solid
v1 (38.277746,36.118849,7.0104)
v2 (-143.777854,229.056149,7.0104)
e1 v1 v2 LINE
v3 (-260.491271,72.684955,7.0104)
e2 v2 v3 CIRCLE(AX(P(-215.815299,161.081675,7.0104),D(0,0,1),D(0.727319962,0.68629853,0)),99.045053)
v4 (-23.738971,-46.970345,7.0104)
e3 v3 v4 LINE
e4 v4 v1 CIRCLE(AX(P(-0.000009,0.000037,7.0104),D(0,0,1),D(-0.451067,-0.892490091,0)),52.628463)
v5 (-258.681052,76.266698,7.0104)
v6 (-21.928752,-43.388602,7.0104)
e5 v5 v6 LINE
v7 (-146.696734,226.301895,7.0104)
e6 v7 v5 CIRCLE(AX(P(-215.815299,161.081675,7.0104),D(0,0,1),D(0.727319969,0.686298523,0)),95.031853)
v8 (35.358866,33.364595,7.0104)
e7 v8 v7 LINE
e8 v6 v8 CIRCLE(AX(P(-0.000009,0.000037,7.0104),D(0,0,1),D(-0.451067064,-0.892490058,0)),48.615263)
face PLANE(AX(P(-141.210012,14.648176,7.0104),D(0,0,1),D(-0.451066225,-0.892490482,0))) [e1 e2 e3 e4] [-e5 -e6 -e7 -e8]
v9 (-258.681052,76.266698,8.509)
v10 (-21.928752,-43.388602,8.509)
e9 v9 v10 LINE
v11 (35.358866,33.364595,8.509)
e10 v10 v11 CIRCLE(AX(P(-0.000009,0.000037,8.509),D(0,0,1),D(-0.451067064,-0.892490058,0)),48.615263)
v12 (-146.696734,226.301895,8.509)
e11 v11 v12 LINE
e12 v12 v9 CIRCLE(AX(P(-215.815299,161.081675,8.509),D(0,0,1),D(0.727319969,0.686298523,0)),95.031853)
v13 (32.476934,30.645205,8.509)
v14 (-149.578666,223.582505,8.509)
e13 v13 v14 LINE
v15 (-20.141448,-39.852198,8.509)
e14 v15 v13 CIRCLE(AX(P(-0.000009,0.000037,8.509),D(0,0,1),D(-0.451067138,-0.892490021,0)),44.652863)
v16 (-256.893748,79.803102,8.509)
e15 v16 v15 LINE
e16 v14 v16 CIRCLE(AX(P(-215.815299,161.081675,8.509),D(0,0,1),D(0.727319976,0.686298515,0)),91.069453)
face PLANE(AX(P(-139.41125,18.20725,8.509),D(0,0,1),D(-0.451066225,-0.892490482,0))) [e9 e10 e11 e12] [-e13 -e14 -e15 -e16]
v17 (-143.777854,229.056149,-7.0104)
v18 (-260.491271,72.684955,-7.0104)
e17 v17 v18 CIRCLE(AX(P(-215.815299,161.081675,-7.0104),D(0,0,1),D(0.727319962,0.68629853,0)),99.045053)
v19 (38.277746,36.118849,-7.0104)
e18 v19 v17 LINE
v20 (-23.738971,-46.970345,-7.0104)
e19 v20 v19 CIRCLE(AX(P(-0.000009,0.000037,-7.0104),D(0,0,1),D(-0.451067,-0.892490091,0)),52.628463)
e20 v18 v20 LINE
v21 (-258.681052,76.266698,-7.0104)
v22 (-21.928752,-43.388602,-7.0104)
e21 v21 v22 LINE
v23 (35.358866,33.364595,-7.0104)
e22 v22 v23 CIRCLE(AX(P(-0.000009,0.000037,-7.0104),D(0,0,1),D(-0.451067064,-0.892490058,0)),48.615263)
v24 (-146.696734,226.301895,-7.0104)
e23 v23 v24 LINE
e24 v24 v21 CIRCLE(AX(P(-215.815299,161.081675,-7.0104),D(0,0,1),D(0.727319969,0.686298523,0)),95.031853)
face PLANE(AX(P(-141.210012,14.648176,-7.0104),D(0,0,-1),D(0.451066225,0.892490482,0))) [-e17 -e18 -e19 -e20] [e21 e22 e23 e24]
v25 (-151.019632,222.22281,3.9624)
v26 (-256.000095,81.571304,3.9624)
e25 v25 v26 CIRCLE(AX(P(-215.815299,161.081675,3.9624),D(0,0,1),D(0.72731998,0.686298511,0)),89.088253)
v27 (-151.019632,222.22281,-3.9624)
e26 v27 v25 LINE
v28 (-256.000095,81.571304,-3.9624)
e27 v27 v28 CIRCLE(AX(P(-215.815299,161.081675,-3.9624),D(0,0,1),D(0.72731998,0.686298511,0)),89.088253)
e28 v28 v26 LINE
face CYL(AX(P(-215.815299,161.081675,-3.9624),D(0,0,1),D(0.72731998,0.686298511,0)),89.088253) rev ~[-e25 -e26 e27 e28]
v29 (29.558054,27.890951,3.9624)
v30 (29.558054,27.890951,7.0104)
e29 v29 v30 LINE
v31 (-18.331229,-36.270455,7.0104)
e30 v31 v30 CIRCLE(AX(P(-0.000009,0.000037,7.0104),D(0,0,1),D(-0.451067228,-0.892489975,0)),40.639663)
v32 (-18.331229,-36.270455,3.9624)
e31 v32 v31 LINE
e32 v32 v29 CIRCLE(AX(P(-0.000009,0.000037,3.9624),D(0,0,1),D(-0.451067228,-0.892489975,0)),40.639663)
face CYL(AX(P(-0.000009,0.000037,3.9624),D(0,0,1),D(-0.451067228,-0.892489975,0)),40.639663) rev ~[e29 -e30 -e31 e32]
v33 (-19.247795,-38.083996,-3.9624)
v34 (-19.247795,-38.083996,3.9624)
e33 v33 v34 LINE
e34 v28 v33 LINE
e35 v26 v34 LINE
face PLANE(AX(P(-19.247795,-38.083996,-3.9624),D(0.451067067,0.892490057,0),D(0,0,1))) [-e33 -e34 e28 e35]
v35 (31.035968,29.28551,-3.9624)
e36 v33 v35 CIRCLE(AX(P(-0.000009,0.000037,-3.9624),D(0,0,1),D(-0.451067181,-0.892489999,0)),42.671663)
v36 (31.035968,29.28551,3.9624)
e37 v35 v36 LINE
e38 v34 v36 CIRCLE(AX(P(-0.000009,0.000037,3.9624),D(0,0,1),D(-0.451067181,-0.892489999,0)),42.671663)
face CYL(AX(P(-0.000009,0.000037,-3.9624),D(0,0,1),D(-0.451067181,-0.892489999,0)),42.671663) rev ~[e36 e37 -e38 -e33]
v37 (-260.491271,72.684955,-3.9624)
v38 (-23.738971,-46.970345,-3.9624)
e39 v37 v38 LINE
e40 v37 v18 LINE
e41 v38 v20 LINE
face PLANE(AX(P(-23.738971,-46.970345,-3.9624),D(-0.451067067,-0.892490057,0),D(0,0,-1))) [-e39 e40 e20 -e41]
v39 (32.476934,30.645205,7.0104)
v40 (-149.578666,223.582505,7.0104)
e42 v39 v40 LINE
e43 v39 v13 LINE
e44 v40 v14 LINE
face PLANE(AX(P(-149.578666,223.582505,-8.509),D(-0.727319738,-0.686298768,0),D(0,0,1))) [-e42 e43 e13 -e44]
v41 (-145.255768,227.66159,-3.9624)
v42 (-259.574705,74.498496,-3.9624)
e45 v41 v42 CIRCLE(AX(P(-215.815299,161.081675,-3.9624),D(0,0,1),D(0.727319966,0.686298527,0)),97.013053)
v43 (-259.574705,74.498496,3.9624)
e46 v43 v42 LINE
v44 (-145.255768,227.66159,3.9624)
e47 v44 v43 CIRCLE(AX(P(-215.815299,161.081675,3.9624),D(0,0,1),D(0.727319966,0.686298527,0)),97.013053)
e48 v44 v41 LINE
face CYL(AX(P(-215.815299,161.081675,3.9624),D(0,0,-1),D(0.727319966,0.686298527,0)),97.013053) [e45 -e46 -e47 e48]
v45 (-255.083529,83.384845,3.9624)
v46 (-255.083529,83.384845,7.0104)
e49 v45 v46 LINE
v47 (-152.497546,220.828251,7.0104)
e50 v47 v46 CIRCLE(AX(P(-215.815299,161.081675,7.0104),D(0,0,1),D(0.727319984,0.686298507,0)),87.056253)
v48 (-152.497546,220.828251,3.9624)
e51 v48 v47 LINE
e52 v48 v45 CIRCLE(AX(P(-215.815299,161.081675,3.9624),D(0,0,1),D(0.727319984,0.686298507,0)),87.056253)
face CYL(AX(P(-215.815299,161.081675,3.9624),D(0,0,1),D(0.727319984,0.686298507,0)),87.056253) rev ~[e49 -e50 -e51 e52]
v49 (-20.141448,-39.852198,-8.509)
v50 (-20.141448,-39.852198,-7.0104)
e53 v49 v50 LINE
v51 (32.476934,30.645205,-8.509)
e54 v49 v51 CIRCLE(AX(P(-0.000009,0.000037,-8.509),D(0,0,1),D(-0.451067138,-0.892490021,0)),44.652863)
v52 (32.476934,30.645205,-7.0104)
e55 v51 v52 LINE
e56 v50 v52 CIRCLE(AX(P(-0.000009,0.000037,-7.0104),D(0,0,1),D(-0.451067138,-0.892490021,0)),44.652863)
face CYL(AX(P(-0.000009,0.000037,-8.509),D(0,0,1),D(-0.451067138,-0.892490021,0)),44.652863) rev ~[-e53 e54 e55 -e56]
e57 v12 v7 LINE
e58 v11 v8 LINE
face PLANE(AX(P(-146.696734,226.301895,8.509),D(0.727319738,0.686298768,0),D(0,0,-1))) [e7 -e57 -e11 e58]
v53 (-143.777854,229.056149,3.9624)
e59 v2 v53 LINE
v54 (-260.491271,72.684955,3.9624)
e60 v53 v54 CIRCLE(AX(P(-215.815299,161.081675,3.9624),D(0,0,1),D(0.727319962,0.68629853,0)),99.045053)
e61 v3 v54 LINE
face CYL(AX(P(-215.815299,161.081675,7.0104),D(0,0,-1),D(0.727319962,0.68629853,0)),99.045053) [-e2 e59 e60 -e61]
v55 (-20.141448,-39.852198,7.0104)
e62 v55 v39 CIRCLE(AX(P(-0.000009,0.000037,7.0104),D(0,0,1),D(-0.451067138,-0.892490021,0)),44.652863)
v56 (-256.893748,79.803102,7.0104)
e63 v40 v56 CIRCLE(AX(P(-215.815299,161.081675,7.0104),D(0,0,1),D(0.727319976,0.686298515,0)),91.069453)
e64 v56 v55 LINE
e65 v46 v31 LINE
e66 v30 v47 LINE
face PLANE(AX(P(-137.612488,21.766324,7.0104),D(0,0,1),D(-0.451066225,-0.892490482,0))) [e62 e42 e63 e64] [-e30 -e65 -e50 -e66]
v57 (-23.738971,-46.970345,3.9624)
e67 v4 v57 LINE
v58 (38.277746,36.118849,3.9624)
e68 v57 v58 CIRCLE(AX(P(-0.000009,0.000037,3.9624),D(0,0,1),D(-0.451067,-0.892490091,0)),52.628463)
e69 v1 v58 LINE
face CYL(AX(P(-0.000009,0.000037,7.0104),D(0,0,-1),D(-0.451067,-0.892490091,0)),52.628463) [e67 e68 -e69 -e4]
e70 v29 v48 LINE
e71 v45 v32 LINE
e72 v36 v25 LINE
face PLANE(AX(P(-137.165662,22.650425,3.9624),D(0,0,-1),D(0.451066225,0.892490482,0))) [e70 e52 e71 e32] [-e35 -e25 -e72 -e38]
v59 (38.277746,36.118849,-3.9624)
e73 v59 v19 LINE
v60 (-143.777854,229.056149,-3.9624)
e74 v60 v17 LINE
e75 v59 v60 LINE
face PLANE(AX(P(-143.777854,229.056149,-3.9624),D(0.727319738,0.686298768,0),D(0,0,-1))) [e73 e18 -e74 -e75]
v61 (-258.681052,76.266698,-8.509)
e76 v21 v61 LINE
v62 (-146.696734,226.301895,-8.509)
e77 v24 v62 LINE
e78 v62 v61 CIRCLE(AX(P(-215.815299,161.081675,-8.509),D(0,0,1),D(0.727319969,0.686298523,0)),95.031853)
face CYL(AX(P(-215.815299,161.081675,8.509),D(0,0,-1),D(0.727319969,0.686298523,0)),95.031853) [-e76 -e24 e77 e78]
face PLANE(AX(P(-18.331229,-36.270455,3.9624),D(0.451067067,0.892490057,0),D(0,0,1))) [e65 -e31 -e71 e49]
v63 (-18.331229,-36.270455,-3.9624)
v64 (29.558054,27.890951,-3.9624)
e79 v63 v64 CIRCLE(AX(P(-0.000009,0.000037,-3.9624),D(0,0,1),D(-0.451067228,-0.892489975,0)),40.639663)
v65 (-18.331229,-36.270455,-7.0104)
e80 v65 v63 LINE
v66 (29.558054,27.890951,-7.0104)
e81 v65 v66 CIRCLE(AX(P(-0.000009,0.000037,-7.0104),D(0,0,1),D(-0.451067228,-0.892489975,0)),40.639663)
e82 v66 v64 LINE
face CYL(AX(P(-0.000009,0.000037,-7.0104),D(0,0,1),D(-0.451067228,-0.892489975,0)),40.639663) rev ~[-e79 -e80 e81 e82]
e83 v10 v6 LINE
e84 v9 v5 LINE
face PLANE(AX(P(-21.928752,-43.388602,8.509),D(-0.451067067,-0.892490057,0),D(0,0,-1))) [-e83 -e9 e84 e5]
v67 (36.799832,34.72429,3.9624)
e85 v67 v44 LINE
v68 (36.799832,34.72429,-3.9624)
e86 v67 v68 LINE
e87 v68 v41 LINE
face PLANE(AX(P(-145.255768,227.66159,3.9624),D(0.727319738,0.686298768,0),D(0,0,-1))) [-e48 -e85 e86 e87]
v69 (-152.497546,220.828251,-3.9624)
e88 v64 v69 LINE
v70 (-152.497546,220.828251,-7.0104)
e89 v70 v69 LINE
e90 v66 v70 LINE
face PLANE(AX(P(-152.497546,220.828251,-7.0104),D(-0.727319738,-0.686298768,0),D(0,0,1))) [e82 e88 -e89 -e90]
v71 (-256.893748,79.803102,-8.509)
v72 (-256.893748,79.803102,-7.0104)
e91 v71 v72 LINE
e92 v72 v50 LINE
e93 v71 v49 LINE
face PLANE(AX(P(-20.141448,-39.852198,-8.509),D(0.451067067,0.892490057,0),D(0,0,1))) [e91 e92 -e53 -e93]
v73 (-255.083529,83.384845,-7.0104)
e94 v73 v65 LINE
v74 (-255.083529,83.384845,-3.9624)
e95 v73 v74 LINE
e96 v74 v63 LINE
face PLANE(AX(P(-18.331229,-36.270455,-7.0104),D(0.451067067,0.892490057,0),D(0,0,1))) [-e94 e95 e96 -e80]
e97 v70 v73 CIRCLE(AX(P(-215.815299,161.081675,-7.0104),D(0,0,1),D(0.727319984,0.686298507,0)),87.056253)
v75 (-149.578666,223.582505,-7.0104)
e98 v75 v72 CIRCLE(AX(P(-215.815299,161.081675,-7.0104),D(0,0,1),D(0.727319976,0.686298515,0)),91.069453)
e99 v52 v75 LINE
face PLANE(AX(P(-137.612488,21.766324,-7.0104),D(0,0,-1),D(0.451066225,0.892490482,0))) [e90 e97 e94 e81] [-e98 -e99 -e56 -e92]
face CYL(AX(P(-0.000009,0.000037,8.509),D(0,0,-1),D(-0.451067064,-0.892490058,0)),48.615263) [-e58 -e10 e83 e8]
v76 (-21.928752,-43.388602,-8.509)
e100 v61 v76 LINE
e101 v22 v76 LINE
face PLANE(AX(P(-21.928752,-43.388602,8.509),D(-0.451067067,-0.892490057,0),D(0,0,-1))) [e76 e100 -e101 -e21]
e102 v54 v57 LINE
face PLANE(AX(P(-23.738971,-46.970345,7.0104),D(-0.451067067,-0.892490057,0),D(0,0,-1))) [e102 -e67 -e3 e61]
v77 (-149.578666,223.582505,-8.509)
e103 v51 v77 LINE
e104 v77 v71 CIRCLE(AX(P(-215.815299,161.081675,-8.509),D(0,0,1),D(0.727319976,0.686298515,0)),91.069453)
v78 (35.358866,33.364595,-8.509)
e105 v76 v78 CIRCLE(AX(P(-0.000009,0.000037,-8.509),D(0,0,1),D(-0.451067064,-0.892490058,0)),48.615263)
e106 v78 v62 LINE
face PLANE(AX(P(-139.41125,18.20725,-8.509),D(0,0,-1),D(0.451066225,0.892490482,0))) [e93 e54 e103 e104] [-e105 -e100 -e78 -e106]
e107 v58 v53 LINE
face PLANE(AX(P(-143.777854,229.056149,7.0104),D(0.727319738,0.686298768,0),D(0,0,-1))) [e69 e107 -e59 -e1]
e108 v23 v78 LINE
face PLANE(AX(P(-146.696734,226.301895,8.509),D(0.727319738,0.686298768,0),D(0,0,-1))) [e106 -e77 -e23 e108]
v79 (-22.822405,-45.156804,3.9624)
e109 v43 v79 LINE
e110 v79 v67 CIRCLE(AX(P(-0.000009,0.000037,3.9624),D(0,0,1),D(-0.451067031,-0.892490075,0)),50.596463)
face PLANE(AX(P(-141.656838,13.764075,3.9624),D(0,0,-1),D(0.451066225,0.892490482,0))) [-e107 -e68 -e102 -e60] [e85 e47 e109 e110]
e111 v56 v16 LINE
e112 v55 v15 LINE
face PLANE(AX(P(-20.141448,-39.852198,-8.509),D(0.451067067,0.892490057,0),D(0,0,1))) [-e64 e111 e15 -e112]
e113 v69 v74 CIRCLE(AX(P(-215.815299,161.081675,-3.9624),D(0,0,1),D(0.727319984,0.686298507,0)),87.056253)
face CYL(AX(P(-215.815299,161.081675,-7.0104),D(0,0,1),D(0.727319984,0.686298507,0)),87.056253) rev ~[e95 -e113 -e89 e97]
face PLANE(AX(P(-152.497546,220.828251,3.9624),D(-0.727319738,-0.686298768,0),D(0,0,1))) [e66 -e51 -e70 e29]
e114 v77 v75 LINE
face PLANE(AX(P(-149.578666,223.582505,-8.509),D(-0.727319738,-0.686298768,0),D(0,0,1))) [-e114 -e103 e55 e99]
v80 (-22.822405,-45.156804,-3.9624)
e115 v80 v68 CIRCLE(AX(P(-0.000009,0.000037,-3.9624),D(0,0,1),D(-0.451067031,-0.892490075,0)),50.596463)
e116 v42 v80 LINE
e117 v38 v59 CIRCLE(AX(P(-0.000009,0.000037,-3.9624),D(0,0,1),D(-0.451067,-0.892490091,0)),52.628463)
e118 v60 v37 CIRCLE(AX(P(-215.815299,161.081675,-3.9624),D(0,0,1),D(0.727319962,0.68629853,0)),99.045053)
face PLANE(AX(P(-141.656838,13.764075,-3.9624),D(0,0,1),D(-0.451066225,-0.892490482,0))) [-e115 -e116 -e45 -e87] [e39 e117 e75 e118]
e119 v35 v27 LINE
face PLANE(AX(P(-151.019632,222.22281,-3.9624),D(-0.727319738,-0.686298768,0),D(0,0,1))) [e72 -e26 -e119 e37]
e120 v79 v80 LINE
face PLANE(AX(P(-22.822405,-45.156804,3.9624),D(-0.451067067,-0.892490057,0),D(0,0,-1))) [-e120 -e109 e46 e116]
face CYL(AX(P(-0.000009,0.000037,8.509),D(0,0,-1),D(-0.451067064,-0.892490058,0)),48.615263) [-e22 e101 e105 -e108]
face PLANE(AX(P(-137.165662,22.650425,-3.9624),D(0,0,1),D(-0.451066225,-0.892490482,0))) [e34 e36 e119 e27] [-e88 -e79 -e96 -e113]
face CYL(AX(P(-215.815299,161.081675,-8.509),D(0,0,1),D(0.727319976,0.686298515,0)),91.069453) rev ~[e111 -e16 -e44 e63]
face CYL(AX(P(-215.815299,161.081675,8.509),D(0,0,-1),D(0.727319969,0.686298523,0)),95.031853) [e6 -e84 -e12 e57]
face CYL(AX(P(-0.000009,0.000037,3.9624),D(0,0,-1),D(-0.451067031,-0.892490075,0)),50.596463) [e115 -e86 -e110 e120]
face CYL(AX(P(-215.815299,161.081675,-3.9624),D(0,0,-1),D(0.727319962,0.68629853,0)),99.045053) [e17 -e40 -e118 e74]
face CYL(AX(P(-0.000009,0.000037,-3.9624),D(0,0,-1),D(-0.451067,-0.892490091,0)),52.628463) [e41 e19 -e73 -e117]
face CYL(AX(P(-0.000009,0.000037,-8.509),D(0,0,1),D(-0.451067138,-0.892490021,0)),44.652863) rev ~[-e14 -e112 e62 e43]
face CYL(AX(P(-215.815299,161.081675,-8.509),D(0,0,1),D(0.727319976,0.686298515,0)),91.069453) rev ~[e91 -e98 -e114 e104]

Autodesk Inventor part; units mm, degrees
ref_plane "Work Plane2" through (0, 0, 0) normal (-1, 0, 0) x (0, 0, 1)
ref_plane "Work Plane3" through (-215.8153, 161.0817, 0) normal (0.8305242, -0.5569826, 0) x (0, 0, 1)
sketch "Path" plane through (0, 0, 0) normal (0, 0, 1) x (1, 0, 0)
  arc A0 (-21.0351, -41.6204) -> (33.9179, 32.0049) centre (0, 0) ccw
  arc A1 (-148.1377, 224.9422) -> (-257.7874, 78.0349) centre (-215.8153, 161.0817) ccw
  line L0 (-148.1377, 224.9422) -> (33.9179, 32.0049)
  line L1 (-21.0351, -41.6204) -> (-257.7874, 78.0349)
  dimension "d31" = 11.9888
ref_plane "Section Plane" through (33.9179, 32.0049, 0) normal (-0.6862987, 0.7273198, 0) x (0, 0, 1)
sketch "Section Sketch" plane through (33.9179, 32.0049, 0) normal (-0.6862987, 0.7273198, 0) x (0, 0, 1)
  line L0 (-8.509, -1.9812) -> (8.509, -1.9812)
  line L1 (8.509, -1.9812) -> (8.509, 1.9812)
  line L2 (8.509, 1.9812) -> (-8.509, 1.9812)
  line L3 (-8.509, 1.9812) -> (-8.509, -1.9812)
  line L4 (-3.9624, -3.9624) -> (3.9624, -3.9624)
  line L5 (3.9624, -3.9624) -> (3.9624, 3.9624)
  line L6 (3.9624, 3.9624) -> (-3.9624, 3.9624)
  line L7 (-3.9624, 3.9624) -> (-3.9624, -3.9624)
  line L8 (-3.9624, 0) -> (3.9624, 0) construction
  line L9 (-7.0104, -5.9944) -> (-3.9624, -5.9944)
  line L10 (-3.9624, -5.9944) -> (-3.9624, 5.9944)
  line L11 (-3.9624, 5.9944) -> (-7.0104, 5.9944)
  line L12 (-7.0104, 5.9944) -> (-7.0104, -5.9944)
  line L13 (3.9624, -5.9944) -> (7.0104, -5.9944)
  line L14 (7.0104, -5.9944) -> (7.0104, 5.9944)
  line L15 (7.0104, 5.9944) -> (3.9624, 5.9944)
  line L16 (3.9624, 5.9944) -> (3.9624, -5.9944)
  line L17 (-8.509, 0) -> (8.509, 0) construction
  point P0 (0, 0)
  point P1 (0, 0)
  dimension "d21" = 3.9624
  dimension "d22" = 7.9248
  dimension "d23" = 7.9248
  dimension "d24" = 3.048
  dimension "d31" = 11.9888
  dimension "d32" = 17.018
sweep "Solid" add profiles "Section Sketch" path "Path"
pattern_of_one "Strand Pattern"
equation "\"d21\" = da_d2"
equation "\"d22\" = da_d1"
equation "\"d23\" = da_b1"
equation "\"d24\" = da_t1 + da_t2"
equation "\"d30\" = da_pt"
equation "\"da_p\" = 12.7"
equation "\"da_b1\" = 7.9248"
equation "\"da_h2\" = 11.9888"
equation "\"da_h3\" = 10.3886"
equation "\"da_d1\" = 7.9248"
equation "\"da_d2\" = 3.9624"
equation "\"da_pt\" = 14.3764"
equation "\"da_b\" = 17.018"
equation "\"da_t1\" = 1.524"
equation "\"da_t2\" = 1.524"
properties part number "Roller Chain"
